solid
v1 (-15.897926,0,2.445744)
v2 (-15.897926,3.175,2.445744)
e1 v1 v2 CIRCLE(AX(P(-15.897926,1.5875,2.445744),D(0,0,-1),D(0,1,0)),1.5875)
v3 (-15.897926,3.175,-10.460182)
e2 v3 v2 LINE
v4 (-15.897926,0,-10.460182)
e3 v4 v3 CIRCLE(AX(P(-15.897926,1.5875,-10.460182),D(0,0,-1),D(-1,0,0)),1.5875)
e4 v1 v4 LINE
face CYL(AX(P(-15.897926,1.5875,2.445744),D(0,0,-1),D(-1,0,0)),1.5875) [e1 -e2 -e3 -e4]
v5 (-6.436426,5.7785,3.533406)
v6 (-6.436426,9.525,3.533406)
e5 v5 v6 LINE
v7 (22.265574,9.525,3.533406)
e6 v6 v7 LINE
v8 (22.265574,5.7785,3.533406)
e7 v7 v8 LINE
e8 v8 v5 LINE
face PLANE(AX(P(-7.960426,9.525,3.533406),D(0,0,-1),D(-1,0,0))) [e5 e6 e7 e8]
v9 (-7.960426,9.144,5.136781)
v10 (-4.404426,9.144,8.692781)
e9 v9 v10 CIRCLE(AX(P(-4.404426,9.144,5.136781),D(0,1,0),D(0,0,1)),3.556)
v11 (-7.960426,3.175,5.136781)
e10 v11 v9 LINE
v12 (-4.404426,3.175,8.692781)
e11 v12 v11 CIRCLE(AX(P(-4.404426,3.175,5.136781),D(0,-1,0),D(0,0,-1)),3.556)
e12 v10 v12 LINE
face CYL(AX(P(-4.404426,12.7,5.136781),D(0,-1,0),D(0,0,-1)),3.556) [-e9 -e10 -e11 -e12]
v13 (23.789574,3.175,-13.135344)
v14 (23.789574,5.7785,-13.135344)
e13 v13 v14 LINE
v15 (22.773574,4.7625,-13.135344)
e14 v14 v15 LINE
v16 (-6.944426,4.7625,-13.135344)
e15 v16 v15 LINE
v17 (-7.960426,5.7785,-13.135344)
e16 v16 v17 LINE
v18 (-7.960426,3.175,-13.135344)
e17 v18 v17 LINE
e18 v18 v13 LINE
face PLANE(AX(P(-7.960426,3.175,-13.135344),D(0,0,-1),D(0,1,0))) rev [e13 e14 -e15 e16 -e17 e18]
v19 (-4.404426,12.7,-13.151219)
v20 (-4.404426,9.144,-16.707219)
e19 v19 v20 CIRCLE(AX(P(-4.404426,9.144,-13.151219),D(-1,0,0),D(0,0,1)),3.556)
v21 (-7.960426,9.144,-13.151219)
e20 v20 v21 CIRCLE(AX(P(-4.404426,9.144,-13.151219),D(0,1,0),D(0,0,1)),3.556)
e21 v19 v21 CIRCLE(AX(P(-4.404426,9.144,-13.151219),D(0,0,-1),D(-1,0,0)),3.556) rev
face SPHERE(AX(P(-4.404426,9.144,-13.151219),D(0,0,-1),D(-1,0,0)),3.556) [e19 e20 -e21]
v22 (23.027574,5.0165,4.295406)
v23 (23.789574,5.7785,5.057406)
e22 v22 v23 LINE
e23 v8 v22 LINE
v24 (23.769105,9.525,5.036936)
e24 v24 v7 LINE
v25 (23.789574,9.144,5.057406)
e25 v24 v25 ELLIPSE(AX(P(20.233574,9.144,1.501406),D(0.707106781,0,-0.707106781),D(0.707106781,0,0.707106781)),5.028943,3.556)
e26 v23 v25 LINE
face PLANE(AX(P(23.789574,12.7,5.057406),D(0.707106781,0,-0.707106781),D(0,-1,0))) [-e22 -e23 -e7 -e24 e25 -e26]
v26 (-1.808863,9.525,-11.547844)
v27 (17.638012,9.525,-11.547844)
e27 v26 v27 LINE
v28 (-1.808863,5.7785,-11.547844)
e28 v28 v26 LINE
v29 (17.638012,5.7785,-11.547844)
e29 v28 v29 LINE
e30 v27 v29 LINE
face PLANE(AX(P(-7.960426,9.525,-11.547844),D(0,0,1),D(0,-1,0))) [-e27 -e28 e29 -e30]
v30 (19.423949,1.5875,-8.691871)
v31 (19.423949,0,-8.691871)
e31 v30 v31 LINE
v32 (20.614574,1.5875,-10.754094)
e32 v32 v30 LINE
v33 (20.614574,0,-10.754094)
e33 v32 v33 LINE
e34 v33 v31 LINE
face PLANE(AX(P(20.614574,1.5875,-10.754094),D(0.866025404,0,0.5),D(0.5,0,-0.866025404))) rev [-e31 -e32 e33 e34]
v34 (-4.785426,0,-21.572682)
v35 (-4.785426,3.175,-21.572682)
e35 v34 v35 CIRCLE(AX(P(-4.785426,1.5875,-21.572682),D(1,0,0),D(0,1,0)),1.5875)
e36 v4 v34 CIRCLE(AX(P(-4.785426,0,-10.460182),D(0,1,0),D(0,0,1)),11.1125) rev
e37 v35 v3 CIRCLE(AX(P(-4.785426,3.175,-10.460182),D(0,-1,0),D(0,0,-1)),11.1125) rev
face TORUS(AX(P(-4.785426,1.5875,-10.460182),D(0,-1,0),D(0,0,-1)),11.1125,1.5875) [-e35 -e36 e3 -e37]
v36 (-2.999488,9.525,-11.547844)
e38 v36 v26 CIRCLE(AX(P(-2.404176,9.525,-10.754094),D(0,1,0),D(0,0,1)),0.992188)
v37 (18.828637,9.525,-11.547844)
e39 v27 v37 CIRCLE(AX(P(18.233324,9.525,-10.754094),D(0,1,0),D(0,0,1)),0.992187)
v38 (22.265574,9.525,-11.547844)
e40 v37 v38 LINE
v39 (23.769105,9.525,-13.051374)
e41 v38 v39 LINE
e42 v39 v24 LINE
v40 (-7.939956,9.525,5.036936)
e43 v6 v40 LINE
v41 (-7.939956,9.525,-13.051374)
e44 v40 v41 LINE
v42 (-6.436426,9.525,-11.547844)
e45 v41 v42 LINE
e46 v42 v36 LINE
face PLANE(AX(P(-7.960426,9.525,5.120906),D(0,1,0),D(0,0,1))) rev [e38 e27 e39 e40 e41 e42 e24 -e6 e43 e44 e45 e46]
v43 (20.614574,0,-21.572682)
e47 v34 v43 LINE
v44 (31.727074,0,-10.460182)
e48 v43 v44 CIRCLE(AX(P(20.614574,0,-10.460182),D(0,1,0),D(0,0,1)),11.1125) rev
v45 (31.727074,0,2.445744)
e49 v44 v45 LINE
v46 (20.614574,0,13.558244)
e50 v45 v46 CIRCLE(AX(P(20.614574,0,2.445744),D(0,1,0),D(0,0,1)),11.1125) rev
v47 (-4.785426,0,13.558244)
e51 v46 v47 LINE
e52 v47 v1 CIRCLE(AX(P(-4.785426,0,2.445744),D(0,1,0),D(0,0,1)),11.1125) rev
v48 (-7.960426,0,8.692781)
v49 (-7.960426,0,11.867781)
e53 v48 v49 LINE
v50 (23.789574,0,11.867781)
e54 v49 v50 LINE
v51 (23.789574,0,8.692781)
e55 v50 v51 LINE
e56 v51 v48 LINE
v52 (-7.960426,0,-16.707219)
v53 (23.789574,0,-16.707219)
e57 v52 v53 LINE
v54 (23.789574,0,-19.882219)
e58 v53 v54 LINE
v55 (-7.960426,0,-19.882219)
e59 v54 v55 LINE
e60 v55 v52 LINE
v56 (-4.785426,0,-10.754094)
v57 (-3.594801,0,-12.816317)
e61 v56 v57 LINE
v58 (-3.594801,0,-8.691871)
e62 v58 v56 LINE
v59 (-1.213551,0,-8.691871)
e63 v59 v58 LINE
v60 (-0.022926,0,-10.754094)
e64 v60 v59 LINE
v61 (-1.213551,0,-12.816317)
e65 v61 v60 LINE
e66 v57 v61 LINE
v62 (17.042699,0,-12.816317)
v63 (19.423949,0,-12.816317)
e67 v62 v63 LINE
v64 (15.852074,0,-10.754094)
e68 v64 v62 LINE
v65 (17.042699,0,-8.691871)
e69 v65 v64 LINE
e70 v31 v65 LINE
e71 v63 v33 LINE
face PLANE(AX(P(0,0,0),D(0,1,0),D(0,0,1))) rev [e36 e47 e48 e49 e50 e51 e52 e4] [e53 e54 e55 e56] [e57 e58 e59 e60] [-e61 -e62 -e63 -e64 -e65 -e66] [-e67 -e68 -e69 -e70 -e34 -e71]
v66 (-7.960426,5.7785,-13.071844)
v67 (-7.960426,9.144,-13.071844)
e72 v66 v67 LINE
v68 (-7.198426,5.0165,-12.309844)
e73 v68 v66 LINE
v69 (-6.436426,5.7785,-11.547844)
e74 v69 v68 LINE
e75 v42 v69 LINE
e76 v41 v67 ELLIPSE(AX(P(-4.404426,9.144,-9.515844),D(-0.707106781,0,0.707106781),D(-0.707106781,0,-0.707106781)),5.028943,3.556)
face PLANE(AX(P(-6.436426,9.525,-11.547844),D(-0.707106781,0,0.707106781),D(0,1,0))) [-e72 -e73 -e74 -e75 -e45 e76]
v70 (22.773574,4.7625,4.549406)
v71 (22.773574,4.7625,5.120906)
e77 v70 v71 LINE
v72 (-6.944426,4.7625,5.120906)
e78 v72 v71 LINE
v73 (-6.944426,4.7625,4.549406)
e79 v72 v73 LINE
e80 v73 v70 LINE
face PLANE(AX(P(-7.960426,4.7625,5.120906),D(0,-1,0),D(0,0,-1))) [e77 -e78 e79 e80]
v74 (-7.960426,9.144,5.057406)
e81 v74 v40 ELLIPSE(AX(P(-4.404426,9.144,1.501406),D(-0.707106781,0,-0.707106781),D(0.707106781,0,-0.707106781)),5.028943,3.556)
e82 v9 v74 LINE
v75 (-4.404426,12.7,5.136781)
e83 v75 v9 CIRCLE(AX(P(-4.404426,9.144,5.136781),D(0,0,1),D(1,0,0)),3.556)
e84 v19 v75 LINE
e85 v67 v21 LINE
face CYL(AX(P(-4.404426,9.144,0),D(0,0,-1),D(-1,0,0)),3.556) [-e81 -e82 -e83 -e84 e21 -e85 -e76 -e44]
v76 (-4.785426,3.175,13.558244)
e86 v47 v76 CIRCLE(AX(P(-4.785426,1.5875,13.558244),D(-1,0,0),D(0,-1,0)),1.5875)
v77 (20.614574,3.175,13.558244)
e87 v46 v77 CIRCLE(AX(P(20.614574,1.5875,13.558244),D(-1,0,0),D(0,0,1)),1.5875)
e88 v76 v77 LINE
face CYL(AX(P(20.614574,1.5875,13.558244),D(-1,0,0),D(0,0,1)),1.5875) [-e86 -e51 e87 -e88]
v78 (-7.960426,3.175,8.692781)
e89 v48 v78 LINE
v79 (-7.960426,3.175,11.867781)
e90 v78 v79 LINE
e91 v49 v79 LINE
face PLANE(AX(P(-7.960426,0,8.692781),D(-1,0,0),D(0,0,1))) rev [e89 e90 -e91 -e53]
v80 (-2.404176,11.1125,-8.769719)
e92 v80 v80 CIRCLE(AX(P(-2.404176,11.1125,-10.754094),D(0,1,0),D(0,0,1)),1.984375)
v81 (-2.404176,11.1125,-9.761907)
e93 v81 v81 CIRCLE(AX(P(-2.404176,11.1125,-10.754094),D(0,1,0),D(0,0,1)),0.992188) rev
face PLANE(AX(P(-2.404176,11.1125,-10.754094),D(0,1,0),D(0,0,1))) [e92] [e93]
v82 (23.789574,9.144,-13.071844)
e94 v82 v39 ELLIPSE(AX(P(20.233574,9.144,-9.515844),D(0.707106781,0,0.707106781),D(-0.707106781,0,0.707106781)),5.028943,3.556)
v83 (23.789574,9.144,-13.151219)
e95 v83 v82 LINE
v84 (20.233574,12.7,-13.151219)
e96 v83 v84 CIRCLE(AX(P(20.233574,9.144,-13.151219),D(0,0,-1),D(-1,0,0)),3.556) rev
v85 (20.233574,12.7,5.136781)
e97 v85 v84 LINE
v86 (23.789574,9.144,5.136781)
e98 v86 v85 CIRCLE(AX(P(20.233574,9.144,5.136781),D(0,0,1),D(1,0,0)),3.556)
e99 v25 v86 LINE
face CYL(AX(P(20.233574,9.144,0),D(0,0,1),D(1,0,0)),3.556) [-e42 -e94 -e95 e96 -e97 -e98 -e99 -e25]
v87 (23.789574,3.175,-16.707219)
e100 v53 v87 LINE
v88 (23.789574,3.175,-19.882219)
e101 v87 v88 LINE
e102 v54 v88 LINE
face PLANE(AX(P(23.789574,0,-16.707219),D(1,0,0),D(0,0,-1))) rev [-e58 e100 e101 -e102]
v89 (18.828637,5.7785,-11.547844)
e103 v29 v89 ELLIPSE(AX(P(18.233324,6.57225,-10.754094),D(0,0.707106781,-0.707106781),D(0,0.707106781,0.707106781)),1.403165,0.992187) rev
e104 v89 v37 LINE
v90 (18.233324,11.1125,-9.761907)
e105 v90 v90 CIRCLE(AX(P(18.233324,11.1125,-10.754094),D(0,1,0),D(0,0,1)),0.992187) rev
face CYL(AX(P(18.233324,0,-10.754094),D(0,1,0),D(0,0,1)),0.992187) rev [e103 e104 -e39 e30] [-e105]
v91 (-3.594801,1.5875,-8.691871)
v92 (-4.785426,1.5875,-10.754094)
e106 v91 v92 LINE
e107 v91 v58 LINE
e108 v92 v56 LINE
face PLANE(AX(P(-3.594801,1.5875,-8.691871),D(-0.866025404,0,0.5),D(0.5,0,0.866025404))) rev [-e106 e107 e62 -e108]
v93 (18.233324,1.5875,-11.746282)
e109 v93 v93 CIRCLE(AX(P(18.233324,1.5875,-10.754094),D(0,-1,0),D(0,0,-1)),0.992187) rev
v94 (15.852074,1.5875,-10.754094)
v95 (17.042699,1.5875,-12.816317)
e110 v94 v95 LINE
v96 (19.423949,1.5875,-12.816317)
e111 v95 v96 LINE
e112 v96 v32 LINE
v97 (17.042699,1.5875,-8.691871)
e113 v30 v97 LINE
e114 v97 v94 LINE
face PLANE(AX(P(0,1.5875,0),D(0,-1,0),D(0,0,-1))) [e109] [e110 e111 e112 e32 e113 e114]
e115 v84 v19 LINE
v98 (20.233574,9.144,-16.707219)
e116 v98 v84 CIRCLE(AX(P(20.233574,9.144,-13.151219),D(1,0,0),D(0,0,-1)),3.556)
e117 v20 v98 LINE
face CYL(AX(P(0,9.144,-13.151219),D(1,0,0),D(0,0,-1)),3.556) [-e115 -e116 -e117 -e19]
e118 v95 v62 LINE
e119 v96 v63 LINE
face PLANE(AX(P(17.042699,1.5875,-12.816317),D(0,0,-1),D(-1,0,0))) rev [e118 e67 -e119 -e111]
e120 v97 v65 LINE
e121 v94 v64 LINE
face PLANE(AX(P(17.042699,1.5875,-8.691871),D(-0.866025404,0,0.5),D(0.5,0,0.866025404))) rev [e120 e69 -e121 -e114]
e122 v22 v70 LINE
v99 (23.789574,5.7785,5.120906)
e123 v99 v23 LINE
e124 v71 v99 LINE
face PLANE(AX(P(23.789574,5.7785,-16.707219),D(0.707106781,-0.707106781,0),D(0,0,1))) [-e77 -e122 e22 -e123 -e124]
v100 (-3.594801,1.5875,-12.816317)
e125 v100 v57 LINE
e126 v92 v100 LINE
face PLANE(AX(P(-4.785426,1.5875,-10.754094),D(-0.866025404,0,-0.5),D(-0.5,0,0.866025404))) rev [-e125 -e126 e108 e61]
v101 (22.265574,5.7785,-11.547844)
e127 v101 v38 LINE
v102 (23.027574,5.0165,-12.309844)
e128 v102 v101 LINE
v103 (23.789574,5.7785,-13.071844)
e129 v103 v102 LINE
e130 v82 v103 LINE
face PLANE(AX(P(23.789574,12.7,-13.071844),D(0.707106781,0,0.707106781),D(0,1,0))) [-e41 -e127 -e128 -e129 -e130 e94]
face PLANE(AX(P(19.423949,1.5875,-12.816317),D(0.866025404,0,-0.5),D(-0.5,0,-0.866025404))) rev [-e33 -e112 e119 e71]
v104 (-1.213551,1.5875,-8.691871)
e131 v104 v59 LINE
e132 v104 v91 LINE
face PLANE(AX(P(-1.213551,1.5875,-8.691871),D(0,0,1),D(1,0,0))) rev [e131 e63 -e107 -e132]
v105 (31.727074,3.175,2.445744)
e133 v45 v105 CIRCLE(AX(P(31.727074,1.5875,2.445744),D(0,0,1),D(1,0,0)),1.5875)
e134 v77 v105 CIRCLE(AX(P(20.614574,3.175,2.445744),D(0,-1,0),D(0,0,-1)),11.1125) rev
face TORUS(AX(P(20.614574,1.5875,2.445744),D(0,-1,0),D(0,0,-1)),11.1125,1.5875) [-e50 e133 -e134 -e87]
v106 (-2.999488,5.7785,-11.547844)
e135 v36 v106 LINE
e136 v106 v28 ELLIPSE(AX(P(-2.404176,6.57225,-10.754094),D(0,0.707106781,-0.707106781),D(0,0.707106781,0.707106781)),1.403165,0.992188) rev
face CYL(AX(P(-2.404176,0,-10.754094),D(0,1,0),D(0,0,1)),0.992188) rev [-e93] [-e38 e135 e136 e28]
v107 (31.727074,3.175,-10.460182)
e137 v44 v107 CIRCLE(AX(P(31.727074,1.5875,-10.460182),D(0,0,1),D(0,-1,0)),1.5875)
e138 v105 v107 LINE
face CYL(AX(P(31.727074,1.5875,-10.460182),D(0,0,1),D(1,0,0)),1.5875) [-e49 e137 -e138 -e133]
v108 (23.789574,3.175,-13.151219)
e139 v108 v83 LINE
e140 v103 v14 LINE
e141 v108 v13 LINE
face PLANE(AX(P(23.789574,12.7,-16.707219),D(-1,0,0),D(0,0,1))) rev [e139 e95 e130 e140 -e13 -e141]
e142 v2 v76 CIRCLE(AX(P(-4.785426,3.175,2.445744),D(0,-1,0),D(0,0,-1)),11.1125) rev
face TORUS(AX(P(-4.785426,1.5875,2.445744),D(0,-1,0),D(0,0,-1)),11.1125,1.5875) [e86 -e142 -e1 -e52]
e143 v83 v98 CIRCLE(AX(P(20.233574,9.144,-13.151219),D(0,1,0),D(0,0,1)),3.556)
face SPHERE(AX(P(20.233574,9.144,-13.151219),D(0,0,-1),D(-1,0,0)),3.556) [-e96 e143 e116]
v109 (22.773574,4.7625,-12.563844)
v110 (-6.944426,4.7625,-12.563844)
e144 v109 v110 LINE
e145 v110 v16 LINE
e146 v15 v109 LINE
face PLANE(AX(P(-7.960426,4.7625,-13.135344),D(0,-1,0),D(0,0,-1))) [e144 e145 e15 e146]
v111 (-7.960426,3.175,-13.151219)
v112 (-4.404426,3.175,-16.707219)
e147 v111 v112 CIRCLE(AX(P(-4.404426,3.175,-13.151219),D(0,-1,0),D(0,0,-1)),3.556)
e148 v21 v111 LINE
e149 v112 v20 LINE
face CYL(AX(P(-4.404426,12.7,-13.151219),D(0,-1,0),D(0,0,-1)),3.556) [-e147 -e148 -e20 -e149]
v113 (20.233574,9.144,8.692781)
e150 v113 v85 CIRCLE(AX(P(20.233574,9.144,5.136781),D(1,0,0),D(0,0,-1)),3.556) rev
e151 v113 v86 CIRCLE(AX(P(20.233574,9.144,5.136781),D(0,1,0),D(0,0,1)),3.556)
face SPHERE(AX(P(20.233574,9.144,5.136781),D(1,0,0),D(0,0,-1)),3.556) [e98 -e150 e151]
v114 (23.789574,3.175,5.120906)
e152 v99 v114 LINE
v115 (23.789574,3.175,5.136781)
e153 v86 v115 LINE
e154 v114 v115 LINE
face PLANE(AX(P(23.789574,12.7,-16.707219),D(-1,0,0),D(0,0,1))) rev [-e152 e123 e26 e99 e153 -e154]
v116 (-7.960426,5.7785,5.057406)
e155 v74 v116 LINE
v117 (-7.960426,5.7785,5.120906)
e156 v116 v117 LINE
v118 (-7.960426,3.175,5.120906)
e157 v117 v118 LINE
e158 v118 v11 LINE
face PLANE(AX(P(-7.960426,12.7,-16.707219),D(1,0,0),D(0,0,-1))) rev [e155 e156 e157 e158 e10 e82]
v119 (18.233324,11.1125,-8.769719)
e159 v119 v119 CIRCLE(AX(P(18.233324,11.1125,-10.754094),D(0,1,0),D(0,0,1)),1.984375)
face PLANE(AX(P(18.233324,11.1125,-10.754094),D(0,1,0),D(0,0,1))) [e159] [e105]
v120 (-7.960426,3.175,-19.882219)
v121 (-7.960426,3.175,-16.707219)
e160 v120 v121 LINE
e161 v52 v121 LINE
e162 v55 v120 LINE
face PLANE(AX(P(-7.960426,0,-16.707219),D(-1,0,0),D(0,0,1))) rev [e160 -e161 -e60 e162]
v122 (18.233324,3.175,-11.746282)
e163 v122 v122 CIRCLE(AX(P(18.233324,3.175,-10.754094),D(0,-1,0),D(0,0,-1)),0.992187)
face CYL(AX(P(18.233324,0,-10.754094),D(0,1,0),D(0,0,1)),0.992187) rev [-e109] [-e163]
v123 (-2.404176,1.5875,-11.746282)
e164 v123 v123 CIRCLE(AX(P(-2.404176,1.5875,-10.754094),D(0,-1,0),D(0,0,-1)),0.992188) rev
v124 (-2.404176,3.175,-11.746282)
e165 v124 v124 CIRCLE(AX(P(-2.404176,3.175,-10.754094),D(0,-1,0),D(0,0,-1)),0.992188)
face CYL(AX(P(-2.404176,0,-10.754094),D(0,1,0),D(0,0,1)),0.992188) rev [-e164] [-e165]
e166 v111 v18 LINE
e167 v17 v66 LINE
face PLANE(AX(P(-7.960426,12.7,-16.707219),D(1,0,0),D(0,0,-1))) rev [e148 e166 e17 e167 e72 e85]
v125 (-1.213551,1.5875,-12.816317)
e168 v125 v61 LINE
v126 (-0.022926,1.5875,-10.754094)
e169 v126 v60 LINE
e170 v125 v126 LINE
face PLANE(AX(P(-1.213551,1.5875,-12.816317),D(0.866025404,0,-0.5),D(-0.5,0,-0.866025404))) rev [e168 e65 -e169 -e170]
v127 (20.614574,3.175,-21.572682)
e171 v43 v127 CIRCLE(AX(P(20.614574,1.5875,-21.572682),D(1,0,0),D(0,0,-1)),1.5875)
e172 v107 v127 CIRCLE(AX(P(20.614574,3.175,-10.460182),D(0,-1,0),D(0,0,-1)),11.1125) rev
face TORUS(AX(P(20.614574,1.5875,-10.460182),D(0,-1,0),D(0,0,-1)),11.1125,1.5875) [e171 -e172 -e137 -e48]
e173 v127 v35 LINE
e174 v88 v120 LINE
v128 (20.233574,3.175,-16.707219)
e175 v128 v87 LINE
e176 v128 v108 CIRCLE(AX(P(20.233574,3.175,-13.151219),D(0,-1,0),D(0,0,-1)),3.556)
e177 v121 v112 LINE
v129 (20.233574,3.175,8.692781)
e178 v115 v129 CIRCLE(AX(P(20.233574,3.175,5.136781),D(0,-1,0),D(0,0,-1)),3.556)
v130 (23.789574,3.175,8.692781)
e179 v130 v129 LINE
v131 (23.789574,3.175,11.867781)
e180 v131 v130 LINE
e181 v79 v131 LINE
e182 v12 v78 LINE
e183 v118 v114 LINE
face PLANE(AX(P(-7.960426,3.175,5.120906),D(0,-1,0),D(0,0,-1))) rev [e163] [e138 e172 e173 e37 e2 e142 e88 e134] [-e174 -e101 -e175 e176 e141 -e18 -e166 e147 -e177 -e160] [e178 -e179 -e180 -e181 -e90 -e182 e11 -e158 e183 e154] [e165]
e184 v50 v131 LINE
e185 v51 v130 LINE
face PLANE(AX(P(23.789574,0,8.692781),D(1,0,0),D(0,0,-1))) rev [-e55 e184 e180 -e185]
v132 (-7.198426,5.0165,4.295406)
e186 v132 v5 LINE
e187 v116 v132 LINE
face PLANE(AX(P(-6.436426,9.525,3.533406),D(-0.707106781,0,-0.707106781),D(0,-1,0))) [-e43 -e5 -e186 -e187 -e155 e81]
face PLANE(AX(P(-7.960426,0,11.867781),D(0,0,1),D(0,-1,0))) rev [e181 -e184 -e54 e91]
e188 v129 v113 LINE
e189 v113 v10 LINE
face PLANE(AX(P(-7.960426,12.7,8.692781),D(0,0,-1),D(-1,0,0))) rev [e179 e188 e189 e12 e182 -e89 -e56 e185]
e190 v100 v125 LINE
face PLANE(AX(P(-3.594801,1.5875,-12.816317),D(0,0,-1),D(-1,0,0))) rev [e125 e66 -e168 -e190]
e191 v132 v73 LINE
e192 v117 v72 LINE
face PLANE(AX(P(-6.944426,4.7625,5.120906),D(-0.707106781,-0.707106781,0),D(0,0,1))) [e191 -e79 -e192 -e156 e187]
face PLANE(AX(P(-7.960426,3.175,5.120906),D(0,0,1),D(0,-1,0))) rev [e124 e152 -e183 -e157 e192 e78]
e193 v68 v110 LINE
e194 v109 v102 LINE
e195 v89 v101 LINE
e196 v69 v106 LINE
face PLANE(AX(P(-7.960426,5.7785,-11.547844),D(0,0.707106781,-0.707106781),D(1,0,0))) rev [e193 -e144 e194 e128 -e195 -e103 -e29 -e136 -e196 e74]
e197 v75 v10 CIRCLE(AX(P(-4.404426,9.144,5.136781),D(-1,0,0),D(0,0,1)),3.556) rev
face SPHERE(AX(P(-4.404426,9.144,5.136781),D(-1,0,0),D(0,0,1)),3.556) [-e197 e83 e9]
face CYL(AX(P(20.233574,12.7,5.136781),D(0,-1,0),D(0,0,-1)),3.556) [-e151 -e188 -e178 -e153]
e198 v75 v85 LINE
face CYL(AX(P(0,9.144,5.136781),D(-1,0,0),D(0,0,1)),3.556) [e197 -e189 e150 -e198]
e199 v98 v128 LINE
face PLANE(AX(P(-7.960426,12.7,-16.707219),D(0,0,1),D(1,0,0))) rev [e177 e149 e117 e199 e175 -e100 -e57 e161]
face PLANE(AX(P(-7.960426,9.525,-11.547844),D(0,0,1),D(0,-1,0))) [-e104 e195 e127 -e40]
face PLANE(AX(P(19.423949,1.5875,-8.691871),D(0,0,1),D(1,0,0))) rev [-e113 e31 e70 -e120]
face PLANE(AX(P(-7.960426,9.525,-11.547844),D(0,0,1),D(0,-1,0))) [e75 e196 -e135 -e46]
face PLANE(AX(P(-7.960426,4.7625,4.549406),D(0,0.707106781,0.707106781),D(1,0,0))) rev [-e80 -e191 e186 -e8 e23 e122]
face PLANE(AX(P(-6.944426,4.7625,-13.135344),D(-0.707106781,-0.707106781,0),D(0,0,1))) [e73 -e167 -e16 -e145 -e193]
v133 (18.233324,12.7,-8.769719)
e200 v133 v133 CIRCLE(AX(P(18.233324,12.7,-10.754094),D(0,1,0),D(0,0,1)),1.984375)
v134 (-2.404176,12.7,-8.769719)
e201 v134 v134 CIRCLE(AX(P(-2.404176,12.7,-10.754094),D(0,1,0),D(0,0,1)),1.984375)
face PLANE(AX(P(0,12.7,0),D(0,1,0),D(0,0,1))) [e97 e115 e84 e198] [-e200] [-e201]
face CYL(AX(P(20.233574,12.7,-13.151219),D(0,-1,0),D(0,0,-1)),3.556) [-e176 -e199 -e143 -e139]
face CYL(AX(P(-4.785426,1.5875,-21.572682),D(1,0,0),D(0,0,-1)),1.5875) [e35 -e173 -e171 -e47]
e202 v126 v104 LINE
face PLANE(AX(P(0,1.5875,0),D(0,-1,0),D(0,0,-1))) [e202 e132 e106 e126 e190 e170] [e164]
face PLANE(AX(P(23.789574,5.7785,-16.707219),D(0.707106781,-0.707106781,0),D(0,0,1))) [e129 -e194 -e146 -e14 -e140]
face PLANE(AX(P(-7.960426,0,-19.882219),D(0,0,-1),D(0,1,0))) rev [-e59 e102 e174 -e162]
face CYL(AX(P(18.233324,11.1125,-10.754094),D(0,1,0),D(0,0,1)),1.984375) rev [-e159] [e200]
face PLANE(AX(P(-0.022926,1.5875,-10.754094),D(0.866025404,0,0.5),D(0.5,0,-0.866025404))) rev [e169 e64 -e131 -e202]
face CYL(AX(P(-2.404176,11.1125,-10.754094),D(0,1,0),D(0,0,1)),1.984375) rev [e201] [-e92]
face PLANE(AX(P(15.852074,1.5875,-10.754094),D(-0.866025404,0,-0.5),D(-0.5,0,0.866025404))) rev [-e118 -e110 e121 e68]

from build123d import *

# Parameters (mm, degrees)
SKETCH1_W               = 31.75
SKETCH1_H               = 25.4
BOSS_EXTRUDE1_DEPTH     = 12.7
SKETCH2_W               = 18.25625
SKETCH2_H               = 6.35
CUT_EXTRUDE3_DEPTH      = 39.058949894
SKETCH4_W               = 1.5875
SKETCH4_H               = 4.7625
BOSS_EXTRUDE2_DEPTH     = 31.75
CUT_EXTRUDE5_DEPTH      = 31.590858593
CUT_EXTRUDE5_DEPTH_BACK = 31.590858593
SKETCH5_R               = 0.9921875
CUT_EXTRUDE6_DEPTH      = 1.5875
SKETCH7_R               = 1.984375
CUT_EXTRUDE7_DEPTH      = 1.5875
SKETCH8_W               = 50.8
SKETCH8_H               = 38.305926372
SKETCH8_W_2             = 31.75
SKETCH8_H_2             = 25.4
BOSS_EXTRUDE3_DEPTH     = 3.175
SKETCH10_W              = 31.75
SKETCH10_H              = 3.175
CUT_EXTRUDE8_DEPTH      = 42.677098196
FILLET6_R               = 12.7
CHAMFER1_SIZE           = 1.016
CHAMFER2_SIZE           = 1.524
FILLET7_R               = 3.556
FILLET10_R              = 1.5875


# Some blends are built 0.0001 mm under size
with BuildPart() as part:
    # Sketch1 → Boss-Extrude1 (new body)
    with BuildSketch(Plane(origin=(0, 0, 0), x_dir=(1, 0, 0), z_dir=(0, 1, 0))):
        with Locations((7.914574134, 4.007219009)):
            Rectangle(SKETCH1_W, SKETCH1_H)
    extrude(amount=BOSS_EXTRUDE1_DEPTH)

    # Sketch2 → Cut-Extrude3 (cut, through all)
    with BuildSketch(Plane(origin=(23.789574134, 0, 0), x_dir=(0, 0, -1), z_dir=(1, 0, 0))):
        with Locations((4.007219009, 6.35)):
            Rectangle(SKETCH2_W, SKETCH2_H)
    extrude(amount=-CUT_EXTRUDE3_DEPTH, mode=Mode.SUBTRACT)

    # Sketch4 → Boss-Extrude2 (add, through all)
    with BuildSketch(Plane(origin=(23.789574134, 0, 0), x_dir=(0, 0, -1), z_dir=(1, 0, 0))):
        with Locations((-4.327155991, 7.14375)):
            Rectangle(SKETCH4_W, SKETCH4_H)
        with Locations((12.341594009, 7.14375)):
            Rectangle(SKETCH4_W, SKETCH4_H)
    extrude(amount=-BOSS_EXTRUDE2_DEPTH)

    # Sketch5 → Cut-Extrude5 (cut, two sides: drawn at the far end of the back side and taken through both)
    with BuildSketch(Plane(origin=(0, 3.175, 0), x_dir=(1, 0, 0), z_dir=(0, 1, 0)).offset(-CUT_EXTRUDE5_DEPTH_BACK)):
        with Locations(Location((-2.404175866, 10.754094009, 0), (0, 0, 270))):
            Circle(SKETCH5_R)
        with Locations(Location((18.233324134, 10.754094009, 0), (0, 0, 126.869897646))):
            Circle(SKETCH5_R)
    extrude(amount=CUT_EXTRUDE5_DEPTH + CUT_EXTRUDE5_DEPTH_BACK, mode=Mode.SUBTRACT)

    # Sketch6 → Cut-Extrude6 (cut)
    with BuildSketch(Plane.XZ):
        Polygon((-0.022925866, -10.754094009), (-1.213550866, -8.691871016), (-3.594800866, -8.691871016), (-4.785425866, -10.754094009), (-3.594800866, -12.816317002), (-1.213550866, -12.816317002), align=None)
        Polygon((20.614574134, -10.754094009), (19.423949134, -8.691871016), (17.042699134, -8.691871016), (15.852074134, -10.754094009), (17.042699134, -12.816317002), (19.423949134, -12.816317002), align=None)
    extrude(amount=-CUT_EXTRUDE6_DEPTH, mode=Mode.SUBTRACT)

    # Sketch7 → Cut-Extrude7 (cut)
    with BuildSketch(Plane(origin=(0, 12.7, 0), x_dir=(1, 0, 0), z_dir=(0, 1, 0))):
        with Locations(Location((-2.404175866, 10.754094009, 0), (0, 0, 270))):
            Circle(SKETCH7_R)
        with Locations(Location((18.233324134, 10.754094009, 0), (0, 0, 270))):
            Circle(SKETCH7_R)
    extrude(amount=-CUT_EXTRUDE7_DEPTH, mode=Mode.SUBTRACT)

    # Sketch8 → Boss-Extrude3 (add)
    with BuildSketch(Plane.XZ):
        with Locations((7.914574134, -4.007219009)):
            Rectangle(SKETCH8_W, SKETCH8_H)
        with Locations((7.914574134, -4.007219009)):
            Rectangle(SKETCH8_W_2, SKETCH8_H_2, mode=Mode.SUBTRACT)
    extrude(amount=-BOSS_EXTRUDE3_DEPTH)

    # Sketch10 → Cut-Extrude8 (cut, through all)
    with BuildSketch(Plane(origin=(0, 3.175, 0), x_dir=(1, 0, 0), z_dir=(0, 1, 0))):
        with Locations((7.914574134, 18.294719009)):
            Rectangle(SKETCH10_W, SKETCH10_H)
        with Locations((7.914574134, -10.280280991)):
            Rectangle(SKETCH10_W, SKETCH10_H)
    extrude(amount=-CUT_EXTRUDE8_DEPTH, mode=Mode.SUBTRACT)

    # Fillet6
    fillet6_edges = [part.edges().sort_by_distance(p)[0] for p in [
        (-17.485425866, 1.5875, 15.145744177),
        (33.314574134, 1.5875, 15.145744177),
        (33.314574134, 1.5875, -23.160182195),
        (-17.485425866, 1.5875, -23.160182195),
    ]]
    fillet(fillet6_edges, radius=FILLET6_R)

    # Chamfer1
    # the kernel refuses this chamfer: 1.016 mm, written as the material it takes off along each edge
    with BuildSketch(Plane(origin=(-7.960425866, 4.7625, 0.920576075), x_dir=(-0.027495876610586435, 0.9996219169112968, 0), z_dir=(0, 0, 1)), Plane(origin=(-7.960425866, 4.7625, -13.135344009), x_dir=(-0.027495876610586435, 0.9996219169112968, 1.1185418764848949e-15), z_dir=(0, 0, 1))) as chamfer1_piece_1:
        Polygon((CHAMFER1_SIZE * 0.999621916911, -CHAMFER1_SIZE * 0.0274958766106), (-CHAMFER1_SIZE * 0.0274958766106, -CHAMFER1_SIZE * 0.999621916911), (0, 0), align=None)
    extrude(amount=4.200329916, mode=Mode.SUBTRACT)
    with BuildSketch(Plane(origin=(26.402404049, 4.7625, 3.533405991), x_dir=(0, 0.9996219169112968, -0.027495876610586435), z_dir=(-1, 0, 0))) as chamfer1_piece_2:
        Polygon((CHAMFER1_SIZE * 0.999621916911, -CHAMFER1_SIZE * 0.0274958766106), (-CHAMFER1_SIZE * 0.0274958766106, -CHAMFER1_SIZE * 0.999621916911), (0, 0), align=None)
    extrude(amount=36.975659832, mode=Mode.SUBTRACT)
    with BuildSketch(Plane(origin=(23.789574134, 4.7625, 0.920576075), x_dir=(0.027495876610587285, 0.9996219169112968, 0), z_dir=(0, 0, 1)), Plane(origin=(23.789574134, 4.7625, -13.135344009), x_dir=(0.027495876610587285, 0.9996219169112968, 1.1185418764848949e-15), z_dir=(0, 0, 1))) as chamfer1_piece_3:
        Polygon((CHAMFER1_SIZE * 0.999621916911, CHAMFER1_SIZE * 0.0274958766106), (-CHAMFER1_SIZE * 0.0274958766106, CHAMFER1_SIZE * 0.999621916911), (0, 0), align=None)
    extrude(amount=4.200329916, mode=Mode.SUBTRACT)
    with BuildSketch(Plane(origin=(-0.386658451, 4.7625, -11.547844009), x_dir=(0, -0.027495876610585605, -0.9996219169112968), z_dir=(-1, 0, 0)), Plane(origin=(26.402404049, 4.7625, -11.547844009), x_dir=(0, -0.027495876610585605, -0.9996219169112968), z_dir=(-1, 0, 0))) as chamfer1_piece_4:
        Polygon((CHAMFER1_SIZE * 0.999621916911, -CHAMFER1_SIZE * 0.0274958766106), (-CHAMFER1_SIZE * 0.0274958766106, -CHAMFER1_SIZE * 0.999621916911), (0, 0), align=None)
    extrude(amount=10.186597332, mode=Mode.SUBTRACT)
    with BuildSketch(Plane(origin=(20.250841549, 4.7625, -11.547844009), x_dir=(0, -0.027495876610585605, -0.9996219169112968), z_dir=(-1, 0, 0))) as chamfer1_piece_5:
        Polygon((CHAMFER1_SIZE * 0.999621916911, -CHAMFER1_SIZE * 0.0274958766106), (-CHAMFER1_SIZE * 0.0274958766106, -CHAMFER1_SIZE * 0.999621916911), (0, 0), align=None)
    extrude(amount=24.672534832, mode=Mode.SUBTRACT)

    # Chamfer2
    chamfer2_edges = [part.edges().sort_by_distance(p)[0] for p in [
        (-7.960425866, 7.65175, 3.533405991),
        (23.789574134, 7.65175, 3.533405991),
        (-7.960425866, 7.65175, -11.547844009),
        (23.789574134, 7.65175, -11.547844009),
    ]]
    chamfer(chamfer2_edges, length=CHAMFER2_SIZE)

    # Fillet7
    # the kernel refuses this fillet: 3.556 mm, written as the material it takes off along each edge
    with BuildSketch(Plane(origin=(20.233574134, 9.144, 5.136780991), x_dir=(0, 0, 1), z_dir=(1, 0, 0))) as fillet7_piece_1_section:
        Polygon((0, 0), (FILLET7_R * 1.02, 0), (FILLET7_R * 1.02, -FILLET7_R * 1.02), (0, -FILLET7_R * 1.02), align=None)
    fillet7_piece_1 = extrude(amount=FILLET7_R * 1.02, mode=Mode.PRIVATE)
    fillet7_piece_1 = fillet7_piece_1 - Plane(origin=(20.233574134, 9.144, 5.136780991), x_dir=(0, -0.7071067811865475, -0.7071067811865475), z_dir=(1, 0, 0)) * Sphere(FILLET7_R, mode=Mode.PRIVATE)
    add(fillet7_piece_1, mode=Mode.SUBTRACT)
    with BuildSketch(Plane(origin=(-4.404425866, 9.144, 5.136780991), x_dir=(0, 0, 1), z_dir=(-1, 0, 0))) as fillet7_piece_2_section:
        Polygon((0, 0), (FILLET7_R * 1.02, 0), (FILLET7_R * 1.02, FILLET7_R * 1.02), (0, FILLET7_R * 1.02), align=None)
    fillet7_piece_2 = extrude(amount=FILLET7_R * 1.02, mode=Mode.PRIVATE)
    fillet7_piece_2 = fillet7_piece_2 - Plane(origin=(-4.404425866, 9.144, 5.136780991), x_dir=(0, -0.7071067811865475, -0.7071067811865475), z_dir=(-1, 0, 0)) * Sphere(FILLET7_R, mode=Mode.PRIVATE)
    add(fillet7_piece_2, mode=Mode.SUBTRACT)
    with BuildSketch(Plane(origin=(20.233574134, 9.144, -13.151219009), x_dir=(1, 0, 0), z_dir=(0, 0, -1))) as fillet7_piece_3_section:
        Polygon((0, 0), (FILLET7_R * 1.02, 0), (FILLET7_R * 1.02, -FILLET7_R * 1.02), (0, -FILLET7_R * 1.02), align=None)
    fillet7_piece_3 = extrude(amount=FILLET7_R * 1.02, mode=Mode.PRIVATE)
    fillet7_piece_3 = fillet7_piece_3 - Plane(origin=(20.233574134, 9.144, -13.151219009), x_dir=(-0.7071067811865475, -0.7071067811865475, 0), z_dir=(0, 0, -1)) * Sphere(FILLET7_R, mode=Mode.PRIVATE)
    add(fillet7_piece_3, mode=Mode.SUBTRACT)
    with BuildSketch(Plane(origin=(-4.404425866, 9.144, -13.151219009), x_dir=(-1, 0, 0), z_dir=(0, 0, -1))) as fillet7_piece_4_section:
        Polygon((0, 0), (FILLET7_R * 1.02, 0), (FILLET7_R * 1.02, FILLET7_R * 1.02), (0, FILLET7_R * 1.02), align=None)
    fillet7_piece_4 = extrude(amount=FILLET7_R * 1.02, mode=Mode.PRIVATE)
    fillet7_piece_4 = fillet7_piece_4 - Plane(origin=(-4.404425866, 9.144, -13.151219009), x_dir=(0.7071067811865475, -0.7071067811865475, 0), z_dir=(0, 0, -1)) * Sphere(FILLET7_R, mode=Mode.PRIVATE)
    add(fillet7_piece_4, mode=Mode.SUBTRACT)
    with BuildSketch(Plane(origin=(20.233574134, 12.7, 8.692780991), x_dir=(0, -1, 0), z_dir=(-1, 0, 0))) as fillet7_piece_5:
        with BuildLine():
            CenterArc((FILLET7_R, -FILLET7_R), FILLET7_R, 90, 90)
            Line((0, -FILLET7_R), (0, 0))
            Line((0, 0), (FILLET7_R, 0))
        make_face()
    extrude(amount=24.638, mode=Mode.SUBTRACT)
    with BuildSketch(Plane(origin=(23.789574134, 3.175, 8.692780991), x_dir=(-1, 0, 0), z_dir=(0, 1, 0)), Plane(origin=(-7.960425866, 3.175, -16.707219009), x_dir=(1, 0, 0), z_dir=(0, 1, 0))) as fillet7_piece_6:
        with BuildLine():
            CenterArc((FILLET7_R, -FILLET7_R), FILLET7_R, 90, 90)
            Line((0, -FILLET7_R), (0, 0))
            Line((0, 0), (FILLET7_R, 0))
        make_face()
    extrude(amount=5.969, mode=Mode.SUBTRACT)
    with BuildSketch(Plane(origin=(23.789574134, 12.7, -13.151219009), x_dir=(-1, 0, 0), z_dir=(0, 0, 1)), Plane(origin=(-7.960425866, 12.7, 5.136780991), x_dir=(1, 0, 0), z_dir=(0, 0, -1))) as fillet7_piece_7:
        with BuildLine():
            CenterArc((FILLET7_R, FILLET7_R), FILLET7_R, 180, 90)
            Line((0, FILLET7_R), (0, 0))
            Line((0, 0), (FILLET7_R, 0))
        make_face()
    extrude(amount=18.288, mode=Mode.SUBTRACT)
    with BuildSketch(Plane(origin=(23.789574134, 3.175, -16.707219009), x_dir=(-1, 0, 0), z_dir=(0, 1, 0)), Plane(origin=(-7.960425866, 3.175, 8.692780991), x_dir=(1, 0, 0), z_dir=(0, 1, 0))) as fillet7_piece_8:
        with BuildLine():
            CenterArc((FILLET7_R, FILLET7_R), FILLET7_R, 180, 90)
            Line((0, FILLET7_R), (0, 0))
            Line((0, 0), (FILLET7_R, 0))
        make_face()
    extrude(amount=5.969, mode=Mode.SUBTRACT)
    with BuildSketch(Plane(origin=(-4.404425866, 12.7, -16.707219009), x_dir=(0, 0, 1), z_dir=(1, 0, 0))) as fillet7_piece_9:
        with BuildLine():
            CenterArc((FILLET7_R, FILLET7_R), FILLET7_R, 180, 90)
            Line((0, FILLET7_R), (0, 0))
            Line((0, 0), (FILLET7_R, 0))
        make_face()
    extrude(amount=24.638, mode=Mode.SUBTRACT)

    # Fillet10
    fillet10_edges = [part.edges().sort_by_distance(p)[0] for p in [
        (7.914574134, 3.175, 15.145744177),
        (7.914574134, 0, 15.145744177),
        (-17.485425866, 0, -4.007219009),
        (7.914574134, 0, -23.160182195),
        (33.314574134, 0, -4.007219009),
        (29.594830255, 0, 11.426000298),
        (29.594830255, 0, -19.440438316),
        (-13.765681988, 0, -19.440438316),
        (-13.765681988, 0, 11.426000298),
        (-17.485425866, 3.175, -4.007219009),
        (33.314574134, 3.175, -4.007219009),
        (7.914574134, 3.175, -23.160182195),
    ]]
    fillet(fillet10_edges, radius=FILLET10_R - 0.0001)  # a hair under: the kernel refuses the full size


solid = part.part
